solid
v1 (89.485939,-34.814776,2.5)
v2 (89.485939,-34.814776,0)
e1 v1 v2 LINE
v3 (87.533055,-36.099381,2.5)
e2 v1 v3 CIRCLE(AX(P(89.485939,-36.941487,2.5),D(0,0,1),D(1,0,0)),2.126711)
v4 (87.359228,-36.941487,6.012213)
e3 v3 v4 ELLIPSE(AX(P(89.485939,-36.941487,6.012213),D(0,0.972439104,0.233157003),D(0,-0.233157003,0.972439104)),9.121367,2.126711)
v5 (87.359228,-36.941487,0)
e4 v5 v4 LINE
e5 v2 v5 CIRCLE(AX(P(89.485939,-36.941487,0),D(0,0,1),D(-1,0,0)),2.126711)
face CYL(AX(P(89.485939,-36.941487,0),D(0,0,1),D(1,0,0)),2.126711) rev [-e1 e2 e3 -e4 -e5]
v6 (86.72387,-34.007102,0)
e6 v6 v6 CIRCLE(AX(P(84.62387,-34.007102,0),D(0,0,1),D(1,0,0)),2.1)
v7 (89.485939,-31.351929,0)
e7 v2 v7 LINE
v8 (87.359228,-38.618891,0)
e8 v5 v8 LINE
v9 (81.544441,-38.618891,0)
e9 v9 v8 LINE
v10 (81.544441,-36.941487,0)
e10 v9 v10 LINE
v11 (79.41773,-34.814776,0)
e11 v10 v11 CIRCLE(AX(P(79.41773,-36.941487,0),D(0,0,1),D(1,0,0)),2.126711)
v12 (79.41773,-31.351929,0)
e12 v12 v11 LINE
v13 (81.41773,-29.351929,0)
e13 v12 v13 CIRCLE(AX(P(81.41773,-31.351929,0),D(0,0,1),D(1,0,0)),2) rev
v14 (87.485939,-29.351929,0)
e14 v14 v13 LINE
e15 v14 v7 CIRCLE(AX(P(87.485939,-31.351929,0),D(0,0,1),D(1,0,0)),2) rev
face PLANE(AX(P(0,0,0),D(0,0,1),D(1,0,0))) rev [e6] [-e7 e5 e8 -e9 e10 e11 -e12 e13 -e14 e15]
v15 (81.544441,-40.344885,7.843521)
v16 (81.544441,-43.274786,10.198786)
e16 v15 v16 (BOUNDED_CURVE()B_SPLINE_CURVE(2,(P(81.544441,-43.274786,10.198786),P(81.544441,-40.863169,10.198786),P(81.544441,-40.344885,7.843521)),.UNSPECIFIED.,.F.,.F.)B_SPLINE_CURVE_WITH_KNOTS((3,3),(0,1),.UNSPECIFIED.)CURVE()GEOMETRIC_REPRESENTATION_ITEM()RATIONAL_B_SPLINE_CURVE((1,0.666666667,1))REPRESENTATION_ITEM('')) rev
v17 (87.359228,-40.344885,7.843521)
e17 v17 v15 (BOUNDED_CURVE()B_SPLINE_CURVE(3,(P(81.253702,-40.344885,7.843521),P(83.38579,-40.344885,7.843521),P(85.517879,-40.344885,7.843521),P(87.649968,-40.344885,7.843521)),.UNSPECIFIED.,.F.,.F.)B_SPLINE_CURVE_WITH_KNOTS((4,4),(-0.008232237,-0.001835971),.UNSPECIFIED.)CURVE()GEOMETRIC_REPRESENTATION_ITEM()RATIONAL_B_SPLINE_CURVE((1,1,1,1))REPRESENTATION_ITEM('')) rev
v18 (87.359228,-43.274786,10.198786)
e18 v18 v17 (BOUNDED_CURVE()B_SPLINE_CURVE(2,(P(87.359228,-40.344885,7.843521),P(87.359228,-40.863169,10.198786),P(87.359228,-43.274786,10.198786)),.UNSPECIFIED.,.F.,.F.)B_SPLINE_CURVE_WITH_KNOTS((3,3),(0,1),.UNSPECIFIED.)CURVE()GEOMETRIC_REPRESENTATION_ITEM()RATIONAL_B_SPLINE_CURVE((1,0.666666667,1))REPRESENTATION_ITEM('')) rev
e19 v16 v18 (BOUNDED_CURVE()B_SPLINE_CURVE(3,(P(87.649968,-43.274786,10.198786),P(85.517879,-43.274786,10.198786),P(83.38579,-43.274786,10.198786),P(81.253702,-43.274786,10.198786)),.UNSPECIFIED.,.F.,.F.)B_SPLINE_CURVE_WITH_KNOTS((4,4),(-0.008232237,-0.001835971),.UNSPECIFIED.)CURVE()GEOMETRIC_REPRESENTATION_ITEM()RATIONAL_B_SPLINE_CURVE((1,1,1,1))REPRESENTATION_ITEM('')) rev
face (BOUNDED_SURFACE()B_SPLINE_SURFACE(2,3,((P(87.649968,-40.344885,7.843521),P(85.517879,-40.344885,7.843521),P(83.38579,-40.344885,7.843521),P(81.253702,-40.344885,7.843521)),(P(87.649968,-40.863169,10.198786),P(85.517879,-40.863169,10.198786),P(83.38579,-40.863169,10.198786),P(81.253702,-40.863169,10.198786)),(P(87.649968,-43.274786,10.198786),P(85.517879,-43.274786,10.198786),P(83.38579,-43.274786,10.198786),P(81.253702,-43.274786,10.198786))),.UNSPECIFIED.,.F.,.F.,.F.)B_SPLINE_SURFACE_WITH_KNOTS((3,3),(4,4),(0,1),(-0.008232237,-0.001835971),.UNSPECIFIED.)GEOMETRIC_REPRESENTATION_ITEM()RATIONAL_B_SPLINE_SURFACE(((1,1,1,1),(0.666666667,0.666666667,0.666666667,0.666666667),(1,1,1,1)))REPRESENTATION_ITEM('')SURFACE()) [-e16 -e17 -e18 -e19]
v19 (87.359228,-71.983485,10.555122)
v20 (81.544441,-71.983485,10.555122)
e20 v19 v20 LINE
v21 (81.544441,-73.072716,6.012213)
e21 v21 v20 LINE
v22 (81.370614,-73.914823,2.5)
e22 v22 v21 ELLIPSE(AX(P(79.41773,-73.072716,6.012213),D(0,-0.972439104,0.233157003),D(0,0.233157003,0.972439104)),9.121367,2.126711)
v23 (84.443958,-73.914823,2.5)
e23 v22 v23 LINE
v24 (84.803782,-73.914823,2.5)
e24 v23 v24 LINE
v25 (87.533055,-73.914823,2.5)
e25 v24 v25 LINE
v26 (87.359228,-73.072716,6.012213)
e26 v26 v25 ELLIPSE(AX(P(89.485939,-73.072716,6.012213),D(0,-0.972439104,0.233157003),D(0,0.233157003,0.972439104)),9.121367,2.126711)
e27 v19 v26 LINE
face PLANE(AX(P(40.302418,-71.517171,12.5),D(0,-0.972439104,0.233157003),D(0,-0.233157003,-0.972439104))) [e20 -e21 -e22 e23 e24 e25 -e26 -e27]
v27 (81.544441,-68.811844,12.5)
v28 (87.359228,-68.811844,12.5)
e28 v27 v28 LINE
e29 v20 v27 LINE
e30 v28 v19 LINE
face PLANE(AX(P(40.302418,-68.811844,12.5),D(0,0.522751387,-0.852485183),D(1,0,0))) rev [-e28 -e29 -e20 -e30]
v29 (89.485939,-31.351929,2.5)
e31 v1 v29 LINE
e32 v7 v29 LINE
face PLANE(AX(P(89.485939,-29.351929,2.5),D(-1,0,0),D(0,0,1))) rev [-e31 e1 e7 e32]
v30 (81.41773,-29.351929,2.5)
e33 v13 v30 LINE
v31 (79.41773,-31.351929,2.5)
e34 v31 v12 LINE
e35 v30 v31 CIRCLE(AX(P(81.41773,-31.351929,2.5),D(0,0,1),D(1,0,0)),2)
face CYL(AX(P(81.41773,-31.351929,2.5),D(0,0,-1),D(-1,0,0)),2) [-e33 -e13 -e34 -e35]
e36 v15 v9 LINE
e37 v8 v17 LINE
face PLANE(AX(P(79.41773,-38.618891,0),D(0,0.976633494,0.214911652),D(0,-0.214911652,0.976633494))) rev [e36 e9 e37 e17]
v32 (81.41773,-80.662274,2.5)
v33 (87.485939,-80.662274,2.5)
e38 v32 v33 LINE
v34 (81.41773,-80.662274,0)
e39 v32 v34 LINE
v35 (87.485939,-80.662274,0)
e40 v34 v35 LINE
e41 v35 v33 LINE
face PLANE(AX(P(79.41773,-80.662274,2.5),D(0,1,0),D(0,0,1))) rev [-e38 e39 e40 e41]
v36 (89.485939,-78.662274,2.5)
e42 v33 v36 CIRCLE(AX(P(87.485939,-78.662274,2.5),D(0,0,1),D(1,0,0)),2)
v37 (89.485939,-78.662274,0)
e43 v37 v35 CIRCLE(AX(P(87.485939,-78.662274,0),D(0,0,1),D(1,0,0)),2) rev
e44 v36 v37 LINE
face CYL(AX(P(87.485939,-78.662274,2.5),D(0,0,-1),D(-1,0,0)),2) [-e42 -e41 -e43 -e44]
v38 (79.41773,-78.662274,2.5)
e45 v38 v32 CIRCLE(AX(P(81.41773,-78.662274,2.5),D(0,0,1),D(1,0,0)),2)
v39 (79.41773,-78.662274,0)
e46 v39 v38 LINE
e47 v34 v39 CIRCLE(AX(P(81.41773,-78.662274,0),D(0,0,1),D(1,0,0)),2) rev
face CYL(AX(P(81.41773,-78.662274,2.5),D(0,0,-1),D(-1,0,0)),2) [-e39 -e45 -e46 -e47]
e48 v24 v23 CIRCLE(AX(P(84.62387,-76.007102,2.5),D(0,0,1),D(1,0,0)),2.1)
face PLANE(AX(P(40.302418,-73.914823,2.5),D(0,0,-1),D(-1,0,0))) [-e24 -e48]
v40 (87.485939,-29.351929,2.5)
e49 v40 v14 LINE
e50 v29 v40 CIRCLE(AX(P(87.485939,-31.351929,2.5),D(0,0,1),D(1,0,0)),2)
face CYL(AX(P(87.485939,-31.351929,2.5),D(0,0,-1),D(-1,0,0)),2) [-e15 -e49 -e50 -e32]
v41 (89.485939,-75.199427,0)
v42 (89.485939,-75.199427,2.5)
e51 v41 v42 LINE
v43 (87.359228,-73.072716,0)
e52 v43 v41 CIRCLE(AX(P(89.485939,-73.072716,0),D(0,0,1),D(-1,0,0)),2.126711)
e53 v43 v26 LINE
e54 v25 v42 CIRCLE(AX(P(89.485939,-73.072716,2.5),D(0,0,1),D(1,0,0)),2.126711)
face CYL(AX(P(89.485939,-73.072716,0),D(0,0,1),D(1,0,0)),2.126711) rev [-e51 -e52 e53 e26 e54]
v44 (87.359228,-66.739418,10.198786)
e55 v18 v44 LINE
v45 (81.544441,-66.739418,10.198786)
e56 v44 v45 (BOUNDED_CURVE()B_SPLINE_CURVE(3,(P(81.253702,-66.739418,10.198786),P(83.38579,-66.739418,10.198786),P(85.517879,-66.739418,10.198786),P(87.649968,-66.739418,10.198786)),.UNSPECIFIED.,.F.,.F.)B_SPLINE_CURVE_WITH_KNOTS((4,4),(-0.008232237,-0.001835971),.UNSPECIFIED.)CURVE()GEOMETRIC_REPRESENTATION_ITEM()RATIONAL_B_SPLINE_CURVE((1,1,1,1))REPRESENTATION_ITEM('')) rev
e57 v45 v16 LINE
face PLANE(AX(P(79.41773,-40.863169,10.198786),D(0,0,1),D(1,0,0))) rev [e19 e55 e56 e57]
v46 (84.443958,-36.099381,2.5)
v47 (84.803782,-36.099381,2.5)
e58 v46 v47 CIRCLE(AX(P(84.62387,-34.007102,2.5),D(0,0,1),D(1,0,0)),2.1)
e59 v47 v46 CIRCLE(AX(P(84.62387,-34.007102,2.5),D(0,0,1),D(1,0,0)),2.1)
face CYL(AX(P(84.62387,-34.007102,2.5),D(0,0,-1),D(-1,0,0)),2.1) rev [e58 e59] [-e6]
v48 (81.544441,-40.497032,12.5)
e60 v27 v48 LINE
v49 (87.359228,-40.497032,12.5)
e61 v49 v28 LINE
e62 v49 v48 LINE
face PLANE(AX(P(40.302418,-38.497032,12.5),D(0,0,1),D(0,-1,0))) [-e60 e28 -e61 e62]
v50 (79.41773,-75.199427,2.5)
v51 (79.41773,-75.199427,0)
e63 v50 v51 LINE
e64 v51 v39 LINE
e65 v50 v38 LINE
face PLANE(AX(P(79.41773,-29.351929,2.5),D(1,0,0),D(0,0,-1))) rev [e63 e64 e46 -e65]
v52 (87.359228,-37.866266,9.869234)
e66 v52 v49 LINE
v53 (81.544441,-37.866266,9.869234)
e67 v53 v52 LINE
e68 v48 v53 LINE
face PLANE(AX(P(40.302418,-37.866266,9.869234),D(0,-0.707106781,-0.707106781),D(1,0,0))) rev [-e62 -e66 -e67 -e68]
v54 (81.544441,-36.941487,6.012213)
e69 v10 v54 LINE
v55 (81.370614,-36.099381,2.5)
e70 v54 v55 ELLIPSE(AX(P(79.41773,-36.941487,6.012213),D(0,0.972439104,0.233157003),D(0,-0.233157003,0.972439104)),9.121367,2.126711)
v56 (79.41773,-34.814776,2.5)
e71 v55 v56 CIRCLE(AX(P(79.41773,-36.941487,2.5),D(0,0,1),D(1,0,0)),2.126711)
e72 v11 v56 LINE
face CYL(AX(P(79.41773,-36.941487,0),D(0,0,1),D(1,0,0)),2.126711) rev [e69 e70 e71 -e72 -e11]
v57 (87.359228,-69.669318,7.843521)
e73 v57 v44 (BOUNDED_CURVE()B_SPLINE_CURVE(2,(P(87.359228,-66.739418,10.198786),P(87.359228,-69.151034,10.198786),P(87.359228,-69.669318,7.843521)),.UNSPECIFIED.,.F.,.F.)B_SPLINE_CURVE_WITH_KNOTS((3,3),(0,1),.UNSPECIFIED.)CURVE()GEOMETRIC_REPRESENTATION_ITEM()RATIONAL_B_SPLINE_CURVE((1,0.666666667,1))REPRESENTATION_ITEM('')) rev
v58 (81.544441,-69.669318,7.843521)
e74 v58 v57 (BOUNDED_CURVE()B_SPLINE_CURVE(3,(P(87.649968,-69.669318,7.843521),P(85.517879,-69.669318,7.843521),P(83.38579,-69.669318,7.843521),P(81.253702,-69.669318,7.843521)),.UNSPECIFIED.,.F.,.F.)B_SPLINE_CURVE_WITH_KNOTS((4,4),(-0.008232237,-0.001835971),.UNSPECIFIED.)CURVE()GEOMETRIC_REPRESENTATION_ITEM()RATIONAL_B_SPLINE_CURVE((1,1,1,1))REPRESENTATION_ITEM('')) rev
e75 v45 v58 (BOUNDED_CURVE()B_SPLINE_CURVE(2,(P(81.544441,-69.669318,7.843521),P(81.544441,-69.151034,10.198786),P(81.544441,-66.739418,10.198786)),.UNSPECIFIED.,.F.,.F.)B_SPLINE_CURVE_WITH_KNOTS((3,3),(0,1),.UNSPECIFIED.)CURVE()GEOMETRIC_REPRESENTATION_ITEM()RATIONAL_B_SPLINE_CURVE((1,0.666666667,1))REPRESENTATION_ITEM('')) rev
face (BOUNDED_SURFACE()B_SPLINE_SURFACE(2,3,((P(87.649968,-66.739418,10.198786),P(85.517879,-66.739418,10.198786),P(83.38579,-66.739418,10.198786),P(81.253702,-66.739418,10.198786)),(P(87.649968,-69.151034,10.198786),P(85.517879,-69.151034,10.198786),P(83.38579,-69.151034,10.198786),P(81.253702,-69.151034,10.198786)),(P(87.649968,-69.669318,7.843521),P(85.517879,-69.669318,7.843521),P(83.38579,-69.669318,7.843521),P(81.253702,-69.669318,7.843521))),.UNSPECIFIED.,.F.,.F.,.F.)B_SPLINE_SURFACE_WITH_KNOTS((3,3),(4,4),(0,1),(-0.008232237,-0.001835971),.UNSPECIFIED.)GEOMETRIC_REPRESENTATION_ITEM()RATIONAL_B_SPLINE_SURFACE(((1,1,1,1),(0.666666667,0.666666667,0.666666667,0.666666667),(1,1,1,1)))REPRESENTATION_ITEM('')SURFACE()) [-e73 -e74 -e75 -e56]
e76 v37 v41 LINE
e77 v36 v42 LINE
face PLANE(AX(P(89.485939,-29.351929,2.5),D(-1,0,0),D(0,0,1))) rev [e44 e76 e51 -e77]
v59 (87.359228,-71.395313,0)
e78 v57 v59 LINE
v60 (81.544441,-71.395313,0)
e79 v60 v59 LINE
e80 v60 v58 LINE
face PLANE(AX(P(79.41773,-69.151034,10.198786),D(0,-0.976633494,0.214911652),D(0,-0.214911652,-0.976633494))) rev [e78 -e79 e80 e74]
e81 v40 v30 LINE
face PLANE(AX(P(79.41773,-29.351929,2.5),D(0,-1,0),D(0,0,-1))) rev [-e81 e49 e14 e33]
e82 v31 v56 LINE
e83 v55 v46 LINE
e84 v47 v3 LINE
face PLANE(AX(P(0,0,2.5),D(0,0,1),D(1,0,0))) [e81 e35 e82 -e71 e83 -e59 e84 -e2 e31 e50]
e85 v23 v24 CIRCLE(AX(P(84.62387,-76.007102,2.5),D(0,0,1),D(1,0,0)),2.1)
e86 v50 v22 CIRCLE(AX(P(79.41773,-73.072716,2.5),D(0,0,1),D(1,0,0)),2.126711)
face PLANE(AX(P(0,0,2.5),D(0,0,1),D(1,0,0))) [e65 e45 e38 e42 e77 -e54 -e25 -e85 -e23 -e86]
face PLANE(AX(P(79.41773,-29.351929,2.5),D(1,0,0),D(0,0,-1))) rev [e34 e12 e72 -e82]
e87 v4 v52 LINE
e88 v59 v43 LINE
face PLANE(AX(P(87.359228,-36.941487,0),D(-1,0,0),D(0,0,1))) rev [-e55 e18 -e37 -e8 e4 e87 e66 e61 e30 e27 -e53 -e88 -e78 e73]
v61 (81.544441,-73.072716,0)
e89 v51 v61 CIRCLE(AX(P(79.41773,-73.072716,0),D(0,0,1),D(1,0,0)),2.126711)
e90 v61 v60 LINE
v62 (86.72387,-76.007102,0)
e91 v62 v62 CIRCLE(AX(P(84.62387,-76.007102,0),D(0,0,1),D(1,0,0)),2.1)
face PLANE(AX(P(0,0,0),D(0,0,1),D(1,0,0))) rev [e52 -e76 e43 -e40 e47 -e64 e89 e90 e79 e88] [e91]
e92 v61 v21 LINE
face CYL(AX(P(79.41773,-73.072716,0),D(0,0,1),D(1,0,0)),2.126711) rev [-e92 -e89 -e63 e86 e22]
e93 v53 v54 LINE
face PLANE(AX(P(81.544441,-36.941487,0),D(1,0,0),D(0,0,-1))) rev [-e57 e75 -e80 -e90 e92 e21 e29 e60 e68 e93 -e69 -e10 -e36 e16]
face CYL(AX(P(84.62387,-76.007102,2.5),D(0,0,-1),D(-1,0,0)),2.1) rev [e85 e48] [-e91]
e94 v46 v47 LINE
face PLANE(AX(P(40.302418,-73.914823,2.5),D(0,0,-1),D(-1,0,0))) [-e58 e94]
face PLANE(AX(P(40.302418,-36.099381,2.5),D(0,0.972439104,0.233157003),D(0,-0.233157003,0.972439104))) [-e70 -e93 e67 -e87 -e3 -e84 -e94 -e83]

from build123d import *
from OCP.BRepFilletAPI import BRepFilletAPI_MakeChamfer

# Parameters (mm, degrees)
SKETCH_1_W               = 10.068208361
SKETCH_1_H               = 51.310344827
SKETCH_1_R               = 2.1
EXTRUDE_1_DEPTH          = 2.5
EXTRUDE_2_REACH          = 83.327
CUT_EXTRUDE_1_DEPTH      = 83.243670079
CUT_EXTRUDE_1_DEPTH_BACK = 83.243670079
CUT_EXTRUDE_2_DEPTH      = 122.121367623
CUT_EXTRUDE_2_DEPTH_BACK = 122.121367623
FILLET_2_R               = 2
CHAMFER_2_SIZE           = 2
CHAMFER_2_SIZE2          = 2.70532723


with BuildPart() as part:
    # 草图1 → 凸台-拉伸1 (new body)
    with BuildSketch(Plane.XY):
        with Locations((84.451834639, -55.007101597)):
            Rectangle(SKETCH_1_W, SKETCH_1_H)
        with Locations((84.623869854, -34.007101596)):
            Circle(SKETCH_1_R, mode=Mode.SUBTRACT)
        with Locations((84.623869854, -76.007101596)):
            Circle(SKETCH_1_R, mode=Mode.SUBTRACT)
    extrude(amount=EXTRUDE_1_DEPTH)

    # 凸台-拉伸2: up to this face of the body (flat: up to its plane)
    extrude_2_end = Plane(part.part.faces().sort_by_distance((79.417730458, -55.007101596, 1.25))[0])
    # 草图2 → 凸台-拉伸2 (add, up to the picked face)
    with BuildSketch(Plane(origin=(89.485938819, 0, 0), x_dir=(0, 0, -1), z_dir=(1, 0, 0)), mode=Mode.PRIVATE) as extrude_2_sk1:
        Polygon((-12.5, -71.517171054), (-2.5, -73.914822505), (-2.5, -36.099380688), (-12.5, -38.497032139), align=None)
    extrude_2_tool1 = split(extrude(extrude_2_sk1.sketch, amount=-EXTRUDE_2_REACH, mode=Mode.PRIVATE), bisect_by=extrude_2_end, keep=Keep.BOTH, mode=Mode.PRIVATE)
    add(extrude_2_tool1.solids().sort_by(Axis((89.485939, -55.007102, 7.387173), (-1, 0, 0)))[0])

    # 草图3 → 切除-拉伸1 (cut, two sides: drawn at the far end of the back side and taken through both)
    with BuildSketch(Plane(origin=(89.485938819, 0, 0), x_dir=(0, 0, -1), z_dir=(1, 0, 0)).offset(-CUT_EXTRUDE_1_DEPTH_BACK)):
        Polygon((-10.198786391, -69.151033694), (0, -71.395312685), (0, -38.618890508), (-10.198786391, -40.863169498), align=None)
    extrude(amount=CUT_EXTRUDE_1_DEPTH + CUT_EXTRUDE_1_DEPTH_BACK, mode=Mode.SUBTRACT)

    # 草图4 → 切除-拉伸2 (cut, two sides: drawn at the far end of the back side and taken through both)
    with BuildSketch(Plane.XY.offset(12.5).offset(-CUT_EXTRUDE_2_DEPTH_BACK)):
        with BuildLine():
            Line((81.544440974, -36.941486908), (81.544440974, -73.072716285))
            ThreePointArc((81.544440974, -73.072716285), (79.417730458, -75.199426802), (77.291019941, -73.072716285))
            Line((77.291019941, -73.072716285), (77.291019941, -36.941486908))
            ThreePointArc((77.291019941, -36.941486908), (79.417730458, -34.814776391), (81.544440974, -36.941486908))
        make_face()
        with BuildLine():
            Line((87.359228302, -36.941486908), (87.359228302, -73.072716285))
            ThreePointArc((87.359228302, -73.072716285), (89.485938819, -75.199426802), (91.612649336, -73.072716285))
            Line((91.612649336, -73.072716285), (91.612649336, -36.941486908))
            ThreePointArc((91.612649336, -36.941486908), (89.485938819, -34.814776391), (87.359228302, -36.941486908))
        make_face()
    extrude(amount=CUT_EXTRUDE_2_DEPTH + CUT_EXTRUDE_2_DEPTH_BACK, mode=Mode.SUBTRACT)

    # 圆角1
    # a fillet whose section is not a circle: 3 mm, written as the material it adds along each edge
    with BuildSketch(Plane(origin=(87.359228302, -40.863169498, 10.198786391), x_dir=(0, 0.2149116520268582, -0.9766334941128564), z_dir=(-1, 0, 0)), Plane(origin=(87.359228302, -69.151033694, 10.198786391), x_dir=(0, 1, 0), z_dir=(-1, 0, 0))) as fillet_1_piece_1:
        with BuildLine():
            Bezier((2.411616085, 0), (0, 0), (-0.518284397, 2.355265044), weights=[1, 0.666666667, 1])
            Line((-0.518284397, 2.355265044), (0, 0))
            Line((0, 0), (2.411616085, 0))
        make_face()
    extrude(amount=5.814787328)

    # 圆角2
    fillet_2_edges = [part.edges().sort_by_distance(p)[0] for p in [
        (89.485938819, -80.66227401, 1.25),
        (79.417730458, -80.66227401, 1.25),
        (79.417730458, -29.351929183, 1.25),
        (89.485938819, -29.351929183, 1.25),
    ]]
    fillet(fillet_2_edges, radius=FILLET_2_R)

    # 倒角2: one chamfer whose edges measure the first distance from different faces: ONE call of the kernel's chamfer builder (chamfer() names one face for all edges)
    chamfer_2_edges_1 = [part.edges().sort_by_distance(p)[0] for p in [
        (84.451834638, -71.517171054, 12.5),
    ]]
    chamfer_2_side_1 = [part.faces().sort_by_distance(p)[0] for p in [
        (84.451834638, -72.722762821, 7.471780545),
    ]]
    chamfer_2_edges_2 = [part.edges().sort_by_distance(p)[0] for p in [
        (84.451834638, -38.497032139, 12.5),
    ]]
    chamfer_2_side_2 = [part.faces().sort_by_distance(p)[0] for p in [
        (84.451834638, -55.007101596, 12.5),
    ]]
    chamfer_2 = BRepFilletAPI_MakeChamfer(part.part.solid().wrapped)
    for e in chamfer_2_edges_1:
        chamfer_2.Add(CHAMFER_2_SIZE, CHAMFER_2_SIZE2, e.wrapped, chamfer_2_side_1[0].wrapped)  # the first distance lies on this face
    for e in chamfer_2_edges_2:
        chamfer_2.Add(CHAMFER_2_SIZE, CHAMFER_2_SIZE2, e.wrapped, chamfer_2_side_2[0].wrapped)  # the first distance lies on this face
    add(Compound.cast(chamfer_2.Shape()), mode=Mode.REPLACE)


solid = part.part
